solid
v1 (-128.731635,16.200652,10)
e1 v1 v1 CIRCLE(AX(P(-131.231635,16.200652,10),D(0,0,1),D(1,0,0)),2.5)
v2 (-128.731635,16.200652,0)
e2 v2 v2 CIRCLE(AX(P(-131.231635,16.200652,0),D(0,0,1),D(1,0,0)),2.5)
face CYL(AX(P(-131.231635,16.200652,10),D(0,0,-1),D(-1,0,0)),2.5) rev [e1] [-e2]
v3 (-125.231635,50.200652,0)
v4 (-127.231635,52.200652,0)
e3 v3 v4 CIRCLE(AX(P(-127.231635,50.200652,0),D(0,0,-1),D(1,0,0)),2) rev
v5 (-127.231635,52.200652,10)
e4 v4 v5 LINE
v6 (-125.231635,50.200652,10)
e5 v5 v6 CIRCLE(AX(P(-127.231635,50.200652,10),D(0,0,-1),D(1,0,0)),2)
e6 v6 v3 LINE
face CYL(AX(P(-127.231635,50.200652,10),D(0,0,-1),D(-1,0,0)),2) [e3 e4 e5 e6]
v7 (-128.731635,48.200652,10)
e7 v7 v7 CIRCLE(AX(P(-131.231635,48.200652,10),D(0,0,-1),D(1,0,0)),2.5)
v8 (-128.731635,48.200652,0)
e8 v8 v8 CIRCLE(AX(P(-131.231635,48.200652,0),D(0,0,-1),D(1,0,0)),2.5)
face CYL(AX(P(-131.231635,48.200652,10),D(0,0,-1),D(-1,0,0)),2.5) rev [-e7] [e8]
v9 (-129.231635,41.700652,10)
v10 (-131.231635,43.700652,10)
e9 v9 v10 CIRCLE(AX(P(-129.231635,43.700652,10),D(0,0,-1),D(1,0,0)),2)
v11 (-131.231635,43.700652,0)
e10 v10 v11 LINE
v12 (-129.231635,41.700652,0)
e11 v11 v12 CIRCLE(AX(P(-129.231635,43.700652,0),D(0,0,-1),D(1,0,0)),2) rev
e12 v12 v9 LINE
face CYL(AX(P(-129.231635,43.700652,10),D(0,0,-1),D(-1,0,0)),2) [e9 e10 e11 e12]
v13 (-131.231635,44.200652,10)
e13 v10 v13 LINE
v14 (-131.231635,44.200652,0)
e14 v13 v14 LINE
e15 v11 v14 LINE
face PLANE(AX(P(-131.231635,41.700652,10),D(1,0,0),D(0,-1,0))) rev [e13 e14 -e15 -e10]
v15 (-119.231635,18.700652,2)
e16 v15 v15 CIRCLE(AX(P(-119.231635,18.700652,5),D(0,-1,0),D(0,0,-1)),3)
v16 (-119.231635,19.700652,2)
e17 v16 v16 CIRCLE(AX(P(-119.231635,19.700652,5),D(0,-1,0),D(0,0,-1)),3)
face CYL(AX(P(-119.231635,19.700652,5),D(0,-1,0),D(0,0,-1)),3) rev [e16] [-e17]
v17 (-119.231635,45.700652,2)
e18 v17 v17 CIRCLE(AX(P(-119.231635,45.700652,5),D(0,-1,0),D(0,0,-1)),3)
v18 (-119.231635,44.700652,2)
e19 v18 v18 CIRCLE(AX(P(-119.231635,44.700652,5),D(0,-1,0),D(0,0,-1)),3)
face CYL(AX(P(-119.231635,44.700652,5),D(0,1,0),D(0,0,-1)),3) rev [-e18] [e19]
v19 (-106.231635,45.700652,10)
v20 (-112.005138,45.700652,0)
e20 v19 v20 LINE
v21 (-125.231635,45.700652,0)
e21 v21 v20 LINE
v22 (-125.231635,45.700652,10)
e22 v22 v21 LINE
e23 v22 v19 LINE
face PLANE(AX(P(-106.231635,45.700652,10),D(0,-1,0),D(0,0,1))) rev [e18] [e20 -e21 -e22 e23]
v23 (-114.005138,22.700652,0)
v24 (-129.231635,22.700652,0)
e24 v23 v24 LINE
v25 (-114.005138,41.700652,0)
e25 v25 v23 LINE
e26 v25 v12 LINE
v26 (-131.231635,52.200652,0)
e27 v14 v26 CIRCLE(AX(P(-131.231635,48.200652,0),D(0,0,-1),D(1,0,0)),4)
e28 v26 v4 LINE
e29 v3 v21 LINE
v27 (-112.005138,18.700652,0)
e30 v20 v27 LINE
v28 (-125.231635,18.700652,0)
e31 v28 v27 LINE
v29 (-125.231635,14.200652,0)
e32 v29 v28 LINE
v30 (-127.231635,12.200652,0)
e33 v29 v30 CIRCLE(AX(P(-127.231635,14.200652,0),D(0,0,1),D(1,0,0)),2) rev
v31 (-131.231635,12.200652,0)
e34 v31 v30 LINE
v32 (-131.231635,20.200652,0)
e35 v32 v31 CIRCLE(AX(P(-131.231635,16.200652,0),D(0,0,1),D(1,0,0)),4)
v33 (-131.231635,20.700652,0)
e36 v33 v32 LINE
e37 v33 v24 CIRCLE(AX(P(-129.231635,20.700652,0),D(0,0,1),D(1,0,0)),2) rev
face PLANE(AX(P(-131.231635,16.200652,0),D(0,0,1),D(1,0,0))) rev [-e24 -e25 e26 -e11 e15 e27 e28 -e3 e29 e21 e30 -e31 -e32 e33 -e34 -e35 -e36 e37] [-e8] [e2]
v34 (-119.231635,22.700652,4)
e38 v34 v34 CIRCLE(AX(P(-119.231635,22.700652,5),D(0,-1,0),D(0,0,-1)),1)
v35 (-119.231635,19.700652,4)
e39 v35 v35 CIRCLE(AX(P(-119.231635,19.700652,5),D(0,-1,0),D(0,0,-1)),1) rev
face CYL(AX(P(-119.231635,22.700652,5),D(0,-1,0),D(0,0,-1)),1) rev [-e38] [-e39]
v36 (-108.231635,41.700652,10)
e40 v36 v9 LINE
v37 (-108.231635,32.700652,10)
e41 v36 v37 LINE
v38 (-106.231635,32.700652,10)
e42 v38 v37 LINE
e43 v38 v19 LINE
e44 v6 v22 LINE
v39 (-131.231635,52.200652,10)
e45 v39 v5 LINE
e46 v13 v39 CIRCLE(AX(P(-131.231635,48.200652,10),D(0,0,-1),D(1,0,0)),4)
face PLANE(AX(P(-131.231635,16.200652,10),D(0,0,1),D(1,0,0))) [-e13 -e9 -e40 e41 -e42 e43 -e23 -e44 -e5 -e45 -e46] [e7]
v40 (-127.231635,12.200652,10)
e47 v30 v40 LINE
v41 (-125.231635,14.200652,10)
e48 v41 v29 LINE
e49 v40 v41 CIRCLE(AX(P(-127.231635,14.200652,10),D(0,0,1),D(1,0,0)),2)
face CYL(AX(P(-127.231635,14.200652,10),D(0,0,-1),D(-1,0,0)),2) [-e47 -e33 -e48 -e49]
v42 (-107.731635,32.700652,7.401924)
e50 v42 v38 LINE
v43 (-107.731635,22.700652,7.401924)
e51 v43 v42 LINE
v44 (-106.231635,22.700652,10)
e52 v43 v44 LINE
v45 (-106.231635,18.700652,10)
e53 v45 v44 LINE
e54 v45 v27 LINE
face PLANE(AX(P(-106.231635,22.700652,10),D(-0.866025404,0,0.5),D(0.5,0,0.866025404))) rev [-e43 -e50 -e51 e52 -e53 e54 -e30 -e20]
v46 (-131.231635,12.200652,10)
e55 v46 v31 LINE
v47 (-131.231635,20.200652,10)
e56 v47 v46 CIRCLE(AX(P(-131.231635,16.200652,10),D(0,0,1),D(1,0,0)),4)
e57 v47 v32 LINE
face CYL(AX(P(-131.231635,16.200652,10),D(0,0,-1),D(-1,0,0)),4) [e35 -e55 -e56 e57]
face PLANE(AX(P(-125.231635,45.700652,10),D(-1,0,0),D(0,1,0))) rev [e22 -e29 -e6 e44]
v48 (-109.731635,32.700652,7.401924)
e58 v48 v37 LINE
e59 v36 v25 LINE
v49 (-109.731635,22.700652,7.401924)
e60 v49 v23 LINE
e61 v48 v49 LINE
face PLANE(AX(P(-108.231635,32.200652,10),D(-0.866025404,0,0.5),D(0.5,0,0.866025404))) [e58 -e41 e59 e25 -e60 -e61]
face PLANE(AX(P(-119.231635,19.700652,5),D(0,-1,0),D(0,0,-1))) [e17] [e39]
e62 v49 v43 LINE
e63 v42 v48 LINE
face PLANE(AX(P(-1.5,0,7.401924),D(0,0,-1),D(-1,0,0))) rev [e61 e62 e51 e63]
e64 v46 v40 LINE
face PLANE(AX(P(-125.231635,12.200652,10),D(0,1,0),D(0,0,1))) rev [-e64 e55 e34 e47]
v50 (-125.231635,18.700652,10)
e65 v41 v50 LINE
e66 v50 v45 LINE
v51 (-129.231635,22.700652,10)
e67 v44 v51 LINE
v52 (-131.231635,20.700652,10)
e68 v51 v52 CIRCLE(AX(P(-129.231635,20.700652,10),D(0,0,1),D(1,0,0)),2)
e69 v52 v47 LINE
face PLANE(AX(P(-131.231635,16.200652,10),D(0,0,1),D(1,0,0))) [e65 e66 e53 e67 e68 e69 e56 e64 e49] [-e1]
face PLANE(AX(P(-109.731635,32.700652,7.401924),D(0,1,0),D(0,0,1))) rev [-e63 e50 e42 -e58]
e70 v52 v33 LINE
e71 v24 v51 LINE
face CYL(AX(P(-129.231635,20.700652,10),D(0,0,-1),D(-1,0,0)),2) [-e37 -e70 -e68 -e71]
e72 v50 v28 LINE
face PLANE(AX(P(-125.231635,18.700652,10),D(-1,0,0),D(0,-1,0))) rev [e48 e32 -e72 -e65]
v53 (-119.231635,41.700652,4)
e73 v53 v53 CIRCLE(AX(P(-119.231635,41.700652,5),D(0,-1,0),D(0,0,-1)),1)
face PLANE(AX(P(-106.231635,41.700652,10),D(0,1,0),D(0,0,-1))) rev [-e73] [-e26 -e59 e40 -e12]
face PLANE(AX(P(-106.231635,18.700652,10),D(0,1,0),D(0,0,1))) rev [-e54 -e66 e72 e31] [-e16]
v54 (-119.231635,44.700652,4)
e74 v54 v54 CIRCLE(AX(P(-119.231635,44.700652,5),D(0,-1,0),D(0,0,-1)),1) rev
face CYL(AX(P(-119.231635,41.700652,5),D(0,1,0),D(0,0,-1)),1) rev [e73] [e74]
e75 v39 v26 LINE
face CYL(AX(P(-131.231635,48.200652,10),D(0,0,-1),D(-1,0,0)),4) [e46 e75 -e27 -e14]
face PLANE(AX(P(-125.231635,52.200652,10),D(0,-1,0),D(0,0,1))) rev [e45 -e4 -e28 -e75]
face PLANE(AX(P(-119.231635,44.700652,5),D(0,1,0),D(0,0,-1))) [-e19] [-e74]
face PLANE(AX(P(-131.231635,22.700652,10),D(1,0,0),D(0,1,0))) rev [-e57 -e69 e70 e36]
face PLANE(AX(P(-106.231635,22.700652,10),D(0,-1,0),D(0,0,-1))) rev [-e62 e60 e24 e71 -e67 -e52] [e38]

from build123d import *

# Parameters (mm, degrees)
CROQUIS1_R                = 2.5
SALIENTE_EXTRUIR1_DEPTH   = 10
CROQUIS2_R                = 1
CORTAR_EXTRUIR1_DEPTH     = 4
SALIENTE_EXTRUIR2_DEPTH   = 13.5
CROQUIS4_R                = 3
CORTAR_EXTRUIR2_DEPTH     = 1
REDONDEO1_R               = 2
CORTAR_EXTRUIR3_START     = -2.598076211
CORTAR_EXTRUIR3_OUTLINE_W = 6
CORTAR_EXTRUIR3_OUTLINE_H = 10
CORTAR_EXTRUIR3_DEPTH     = 2.598076211


# Read off the part's stored shape, not the designer's step: Cortar-Extruir3
with BuildPart() as part:
    # Croquis1 → Saliente-Extruir1 (new body)
    with BuildSketch(Plane.XY):
        with BuildLine():
            Line((-106.231635218, 22.700651543), (-131.231635218, 22.700651543))
            Line((-131.231635218, 22.700651543), (-131.231635218, 20.200651543))
            ThreePointArc((-131.231635218, 20.200651543), (-135.231635218, 16.200651543), (-131.231635218, 12.200651543))
            Line((-131.231635218, 12.200651543), (-125.231635218, 12.200651543))
            Line((-125.231635218, 12.200651543), (-125.231635218, 18.700651543))
            Line((-125.231635218, 18.700651543), (-106.231635218, 18.700651543))
            Line((-106.231635218, 18.700651543), (-106.231635218, 22.700651543))
        make_face()
        with Locations((-131.231635218, 16.200651543)):
            Circle(CROQUIS1_R, mode=Mode.SUBTRACT)
    extrude(amount=SALIENTE_EXTRUIR1_DEPTH)

    # Croquis2 → Cortar-Extruir1 (cut)
    with BuildSketch(Plane.XZ.offset(-18.700651543)):
        with Locations(Location((-119.231635218, 5, 0), (0, 0, 270))):
            Circle(CROQUIS2_R)
        Polygon((-106.231635218, 0), (-106.231635218, 10), (-112.00513791, 0), align=None)
    extrude(amount=-CORTAR_EXTRUIR1_DEPTH, mode=Mode.SUBTRACT)

    # Croquis3 → Saliente-Extruir2 (add)
    with BuildSketch(Plane.XZ.offset(-18.700651543)):
        Polygon((-106.231635218, 10), (-108.231635218, 10), (-114.00513791, 0), (-112.00513791, 0), align=None)
    extrude(amount=-SALIENTE_EXTRUIR2_DEPTH)

    # Croquis4 → Cortar-Extruir2 (cut)
    with BuildSketch(Plane.XZ.offset(-18.700651543)):
        with Locations(Location((-119.231635218, 5, 0), (0, 0, 270))):
            Circle(CROQUIS4_R)
    extrude(amount=-CORTAR_EXTRUIR2_DEPTH, mode=Mode.SUBTRACT)

    # Redondeo1
    redondeo1_edges = [part.edges().sort_by_distance(p)[0] for p in [
        (-125.231635218, 12.200651543, 5),
        (-131.231635218, 22.700651543, 5),
    ]]
    fillet(redondeo1_edges, radius=REDONDEO1_R)

    # Simetría1: part across plane


with BuildPart() as part_1:
    add(part.part)
    add(part.part.mirror(Plane(origin=(0, 32.200651543, 0), x_dir=(0, 0, 1), z_dir=(0, -1, 0))))

    # Cortar-Extruir3 outline → Cortar-Extruir3 (cut)
    with BuildSketch(Plane.XY.offset(10).offset(CORTAR_EXTRUIR3_START)):
        with Locations((-108, 27.700651543)):
            Rectangle(CORTAR_EXTRUIR3_OUTLINE_W, CORTAR_EXTRUIR3_OUTLINE_H)
    extrude(amount=CORTAR_EXTRUIR3_DEPTH, mode=Mode.SUBTRACT)


solid = part_1.part
